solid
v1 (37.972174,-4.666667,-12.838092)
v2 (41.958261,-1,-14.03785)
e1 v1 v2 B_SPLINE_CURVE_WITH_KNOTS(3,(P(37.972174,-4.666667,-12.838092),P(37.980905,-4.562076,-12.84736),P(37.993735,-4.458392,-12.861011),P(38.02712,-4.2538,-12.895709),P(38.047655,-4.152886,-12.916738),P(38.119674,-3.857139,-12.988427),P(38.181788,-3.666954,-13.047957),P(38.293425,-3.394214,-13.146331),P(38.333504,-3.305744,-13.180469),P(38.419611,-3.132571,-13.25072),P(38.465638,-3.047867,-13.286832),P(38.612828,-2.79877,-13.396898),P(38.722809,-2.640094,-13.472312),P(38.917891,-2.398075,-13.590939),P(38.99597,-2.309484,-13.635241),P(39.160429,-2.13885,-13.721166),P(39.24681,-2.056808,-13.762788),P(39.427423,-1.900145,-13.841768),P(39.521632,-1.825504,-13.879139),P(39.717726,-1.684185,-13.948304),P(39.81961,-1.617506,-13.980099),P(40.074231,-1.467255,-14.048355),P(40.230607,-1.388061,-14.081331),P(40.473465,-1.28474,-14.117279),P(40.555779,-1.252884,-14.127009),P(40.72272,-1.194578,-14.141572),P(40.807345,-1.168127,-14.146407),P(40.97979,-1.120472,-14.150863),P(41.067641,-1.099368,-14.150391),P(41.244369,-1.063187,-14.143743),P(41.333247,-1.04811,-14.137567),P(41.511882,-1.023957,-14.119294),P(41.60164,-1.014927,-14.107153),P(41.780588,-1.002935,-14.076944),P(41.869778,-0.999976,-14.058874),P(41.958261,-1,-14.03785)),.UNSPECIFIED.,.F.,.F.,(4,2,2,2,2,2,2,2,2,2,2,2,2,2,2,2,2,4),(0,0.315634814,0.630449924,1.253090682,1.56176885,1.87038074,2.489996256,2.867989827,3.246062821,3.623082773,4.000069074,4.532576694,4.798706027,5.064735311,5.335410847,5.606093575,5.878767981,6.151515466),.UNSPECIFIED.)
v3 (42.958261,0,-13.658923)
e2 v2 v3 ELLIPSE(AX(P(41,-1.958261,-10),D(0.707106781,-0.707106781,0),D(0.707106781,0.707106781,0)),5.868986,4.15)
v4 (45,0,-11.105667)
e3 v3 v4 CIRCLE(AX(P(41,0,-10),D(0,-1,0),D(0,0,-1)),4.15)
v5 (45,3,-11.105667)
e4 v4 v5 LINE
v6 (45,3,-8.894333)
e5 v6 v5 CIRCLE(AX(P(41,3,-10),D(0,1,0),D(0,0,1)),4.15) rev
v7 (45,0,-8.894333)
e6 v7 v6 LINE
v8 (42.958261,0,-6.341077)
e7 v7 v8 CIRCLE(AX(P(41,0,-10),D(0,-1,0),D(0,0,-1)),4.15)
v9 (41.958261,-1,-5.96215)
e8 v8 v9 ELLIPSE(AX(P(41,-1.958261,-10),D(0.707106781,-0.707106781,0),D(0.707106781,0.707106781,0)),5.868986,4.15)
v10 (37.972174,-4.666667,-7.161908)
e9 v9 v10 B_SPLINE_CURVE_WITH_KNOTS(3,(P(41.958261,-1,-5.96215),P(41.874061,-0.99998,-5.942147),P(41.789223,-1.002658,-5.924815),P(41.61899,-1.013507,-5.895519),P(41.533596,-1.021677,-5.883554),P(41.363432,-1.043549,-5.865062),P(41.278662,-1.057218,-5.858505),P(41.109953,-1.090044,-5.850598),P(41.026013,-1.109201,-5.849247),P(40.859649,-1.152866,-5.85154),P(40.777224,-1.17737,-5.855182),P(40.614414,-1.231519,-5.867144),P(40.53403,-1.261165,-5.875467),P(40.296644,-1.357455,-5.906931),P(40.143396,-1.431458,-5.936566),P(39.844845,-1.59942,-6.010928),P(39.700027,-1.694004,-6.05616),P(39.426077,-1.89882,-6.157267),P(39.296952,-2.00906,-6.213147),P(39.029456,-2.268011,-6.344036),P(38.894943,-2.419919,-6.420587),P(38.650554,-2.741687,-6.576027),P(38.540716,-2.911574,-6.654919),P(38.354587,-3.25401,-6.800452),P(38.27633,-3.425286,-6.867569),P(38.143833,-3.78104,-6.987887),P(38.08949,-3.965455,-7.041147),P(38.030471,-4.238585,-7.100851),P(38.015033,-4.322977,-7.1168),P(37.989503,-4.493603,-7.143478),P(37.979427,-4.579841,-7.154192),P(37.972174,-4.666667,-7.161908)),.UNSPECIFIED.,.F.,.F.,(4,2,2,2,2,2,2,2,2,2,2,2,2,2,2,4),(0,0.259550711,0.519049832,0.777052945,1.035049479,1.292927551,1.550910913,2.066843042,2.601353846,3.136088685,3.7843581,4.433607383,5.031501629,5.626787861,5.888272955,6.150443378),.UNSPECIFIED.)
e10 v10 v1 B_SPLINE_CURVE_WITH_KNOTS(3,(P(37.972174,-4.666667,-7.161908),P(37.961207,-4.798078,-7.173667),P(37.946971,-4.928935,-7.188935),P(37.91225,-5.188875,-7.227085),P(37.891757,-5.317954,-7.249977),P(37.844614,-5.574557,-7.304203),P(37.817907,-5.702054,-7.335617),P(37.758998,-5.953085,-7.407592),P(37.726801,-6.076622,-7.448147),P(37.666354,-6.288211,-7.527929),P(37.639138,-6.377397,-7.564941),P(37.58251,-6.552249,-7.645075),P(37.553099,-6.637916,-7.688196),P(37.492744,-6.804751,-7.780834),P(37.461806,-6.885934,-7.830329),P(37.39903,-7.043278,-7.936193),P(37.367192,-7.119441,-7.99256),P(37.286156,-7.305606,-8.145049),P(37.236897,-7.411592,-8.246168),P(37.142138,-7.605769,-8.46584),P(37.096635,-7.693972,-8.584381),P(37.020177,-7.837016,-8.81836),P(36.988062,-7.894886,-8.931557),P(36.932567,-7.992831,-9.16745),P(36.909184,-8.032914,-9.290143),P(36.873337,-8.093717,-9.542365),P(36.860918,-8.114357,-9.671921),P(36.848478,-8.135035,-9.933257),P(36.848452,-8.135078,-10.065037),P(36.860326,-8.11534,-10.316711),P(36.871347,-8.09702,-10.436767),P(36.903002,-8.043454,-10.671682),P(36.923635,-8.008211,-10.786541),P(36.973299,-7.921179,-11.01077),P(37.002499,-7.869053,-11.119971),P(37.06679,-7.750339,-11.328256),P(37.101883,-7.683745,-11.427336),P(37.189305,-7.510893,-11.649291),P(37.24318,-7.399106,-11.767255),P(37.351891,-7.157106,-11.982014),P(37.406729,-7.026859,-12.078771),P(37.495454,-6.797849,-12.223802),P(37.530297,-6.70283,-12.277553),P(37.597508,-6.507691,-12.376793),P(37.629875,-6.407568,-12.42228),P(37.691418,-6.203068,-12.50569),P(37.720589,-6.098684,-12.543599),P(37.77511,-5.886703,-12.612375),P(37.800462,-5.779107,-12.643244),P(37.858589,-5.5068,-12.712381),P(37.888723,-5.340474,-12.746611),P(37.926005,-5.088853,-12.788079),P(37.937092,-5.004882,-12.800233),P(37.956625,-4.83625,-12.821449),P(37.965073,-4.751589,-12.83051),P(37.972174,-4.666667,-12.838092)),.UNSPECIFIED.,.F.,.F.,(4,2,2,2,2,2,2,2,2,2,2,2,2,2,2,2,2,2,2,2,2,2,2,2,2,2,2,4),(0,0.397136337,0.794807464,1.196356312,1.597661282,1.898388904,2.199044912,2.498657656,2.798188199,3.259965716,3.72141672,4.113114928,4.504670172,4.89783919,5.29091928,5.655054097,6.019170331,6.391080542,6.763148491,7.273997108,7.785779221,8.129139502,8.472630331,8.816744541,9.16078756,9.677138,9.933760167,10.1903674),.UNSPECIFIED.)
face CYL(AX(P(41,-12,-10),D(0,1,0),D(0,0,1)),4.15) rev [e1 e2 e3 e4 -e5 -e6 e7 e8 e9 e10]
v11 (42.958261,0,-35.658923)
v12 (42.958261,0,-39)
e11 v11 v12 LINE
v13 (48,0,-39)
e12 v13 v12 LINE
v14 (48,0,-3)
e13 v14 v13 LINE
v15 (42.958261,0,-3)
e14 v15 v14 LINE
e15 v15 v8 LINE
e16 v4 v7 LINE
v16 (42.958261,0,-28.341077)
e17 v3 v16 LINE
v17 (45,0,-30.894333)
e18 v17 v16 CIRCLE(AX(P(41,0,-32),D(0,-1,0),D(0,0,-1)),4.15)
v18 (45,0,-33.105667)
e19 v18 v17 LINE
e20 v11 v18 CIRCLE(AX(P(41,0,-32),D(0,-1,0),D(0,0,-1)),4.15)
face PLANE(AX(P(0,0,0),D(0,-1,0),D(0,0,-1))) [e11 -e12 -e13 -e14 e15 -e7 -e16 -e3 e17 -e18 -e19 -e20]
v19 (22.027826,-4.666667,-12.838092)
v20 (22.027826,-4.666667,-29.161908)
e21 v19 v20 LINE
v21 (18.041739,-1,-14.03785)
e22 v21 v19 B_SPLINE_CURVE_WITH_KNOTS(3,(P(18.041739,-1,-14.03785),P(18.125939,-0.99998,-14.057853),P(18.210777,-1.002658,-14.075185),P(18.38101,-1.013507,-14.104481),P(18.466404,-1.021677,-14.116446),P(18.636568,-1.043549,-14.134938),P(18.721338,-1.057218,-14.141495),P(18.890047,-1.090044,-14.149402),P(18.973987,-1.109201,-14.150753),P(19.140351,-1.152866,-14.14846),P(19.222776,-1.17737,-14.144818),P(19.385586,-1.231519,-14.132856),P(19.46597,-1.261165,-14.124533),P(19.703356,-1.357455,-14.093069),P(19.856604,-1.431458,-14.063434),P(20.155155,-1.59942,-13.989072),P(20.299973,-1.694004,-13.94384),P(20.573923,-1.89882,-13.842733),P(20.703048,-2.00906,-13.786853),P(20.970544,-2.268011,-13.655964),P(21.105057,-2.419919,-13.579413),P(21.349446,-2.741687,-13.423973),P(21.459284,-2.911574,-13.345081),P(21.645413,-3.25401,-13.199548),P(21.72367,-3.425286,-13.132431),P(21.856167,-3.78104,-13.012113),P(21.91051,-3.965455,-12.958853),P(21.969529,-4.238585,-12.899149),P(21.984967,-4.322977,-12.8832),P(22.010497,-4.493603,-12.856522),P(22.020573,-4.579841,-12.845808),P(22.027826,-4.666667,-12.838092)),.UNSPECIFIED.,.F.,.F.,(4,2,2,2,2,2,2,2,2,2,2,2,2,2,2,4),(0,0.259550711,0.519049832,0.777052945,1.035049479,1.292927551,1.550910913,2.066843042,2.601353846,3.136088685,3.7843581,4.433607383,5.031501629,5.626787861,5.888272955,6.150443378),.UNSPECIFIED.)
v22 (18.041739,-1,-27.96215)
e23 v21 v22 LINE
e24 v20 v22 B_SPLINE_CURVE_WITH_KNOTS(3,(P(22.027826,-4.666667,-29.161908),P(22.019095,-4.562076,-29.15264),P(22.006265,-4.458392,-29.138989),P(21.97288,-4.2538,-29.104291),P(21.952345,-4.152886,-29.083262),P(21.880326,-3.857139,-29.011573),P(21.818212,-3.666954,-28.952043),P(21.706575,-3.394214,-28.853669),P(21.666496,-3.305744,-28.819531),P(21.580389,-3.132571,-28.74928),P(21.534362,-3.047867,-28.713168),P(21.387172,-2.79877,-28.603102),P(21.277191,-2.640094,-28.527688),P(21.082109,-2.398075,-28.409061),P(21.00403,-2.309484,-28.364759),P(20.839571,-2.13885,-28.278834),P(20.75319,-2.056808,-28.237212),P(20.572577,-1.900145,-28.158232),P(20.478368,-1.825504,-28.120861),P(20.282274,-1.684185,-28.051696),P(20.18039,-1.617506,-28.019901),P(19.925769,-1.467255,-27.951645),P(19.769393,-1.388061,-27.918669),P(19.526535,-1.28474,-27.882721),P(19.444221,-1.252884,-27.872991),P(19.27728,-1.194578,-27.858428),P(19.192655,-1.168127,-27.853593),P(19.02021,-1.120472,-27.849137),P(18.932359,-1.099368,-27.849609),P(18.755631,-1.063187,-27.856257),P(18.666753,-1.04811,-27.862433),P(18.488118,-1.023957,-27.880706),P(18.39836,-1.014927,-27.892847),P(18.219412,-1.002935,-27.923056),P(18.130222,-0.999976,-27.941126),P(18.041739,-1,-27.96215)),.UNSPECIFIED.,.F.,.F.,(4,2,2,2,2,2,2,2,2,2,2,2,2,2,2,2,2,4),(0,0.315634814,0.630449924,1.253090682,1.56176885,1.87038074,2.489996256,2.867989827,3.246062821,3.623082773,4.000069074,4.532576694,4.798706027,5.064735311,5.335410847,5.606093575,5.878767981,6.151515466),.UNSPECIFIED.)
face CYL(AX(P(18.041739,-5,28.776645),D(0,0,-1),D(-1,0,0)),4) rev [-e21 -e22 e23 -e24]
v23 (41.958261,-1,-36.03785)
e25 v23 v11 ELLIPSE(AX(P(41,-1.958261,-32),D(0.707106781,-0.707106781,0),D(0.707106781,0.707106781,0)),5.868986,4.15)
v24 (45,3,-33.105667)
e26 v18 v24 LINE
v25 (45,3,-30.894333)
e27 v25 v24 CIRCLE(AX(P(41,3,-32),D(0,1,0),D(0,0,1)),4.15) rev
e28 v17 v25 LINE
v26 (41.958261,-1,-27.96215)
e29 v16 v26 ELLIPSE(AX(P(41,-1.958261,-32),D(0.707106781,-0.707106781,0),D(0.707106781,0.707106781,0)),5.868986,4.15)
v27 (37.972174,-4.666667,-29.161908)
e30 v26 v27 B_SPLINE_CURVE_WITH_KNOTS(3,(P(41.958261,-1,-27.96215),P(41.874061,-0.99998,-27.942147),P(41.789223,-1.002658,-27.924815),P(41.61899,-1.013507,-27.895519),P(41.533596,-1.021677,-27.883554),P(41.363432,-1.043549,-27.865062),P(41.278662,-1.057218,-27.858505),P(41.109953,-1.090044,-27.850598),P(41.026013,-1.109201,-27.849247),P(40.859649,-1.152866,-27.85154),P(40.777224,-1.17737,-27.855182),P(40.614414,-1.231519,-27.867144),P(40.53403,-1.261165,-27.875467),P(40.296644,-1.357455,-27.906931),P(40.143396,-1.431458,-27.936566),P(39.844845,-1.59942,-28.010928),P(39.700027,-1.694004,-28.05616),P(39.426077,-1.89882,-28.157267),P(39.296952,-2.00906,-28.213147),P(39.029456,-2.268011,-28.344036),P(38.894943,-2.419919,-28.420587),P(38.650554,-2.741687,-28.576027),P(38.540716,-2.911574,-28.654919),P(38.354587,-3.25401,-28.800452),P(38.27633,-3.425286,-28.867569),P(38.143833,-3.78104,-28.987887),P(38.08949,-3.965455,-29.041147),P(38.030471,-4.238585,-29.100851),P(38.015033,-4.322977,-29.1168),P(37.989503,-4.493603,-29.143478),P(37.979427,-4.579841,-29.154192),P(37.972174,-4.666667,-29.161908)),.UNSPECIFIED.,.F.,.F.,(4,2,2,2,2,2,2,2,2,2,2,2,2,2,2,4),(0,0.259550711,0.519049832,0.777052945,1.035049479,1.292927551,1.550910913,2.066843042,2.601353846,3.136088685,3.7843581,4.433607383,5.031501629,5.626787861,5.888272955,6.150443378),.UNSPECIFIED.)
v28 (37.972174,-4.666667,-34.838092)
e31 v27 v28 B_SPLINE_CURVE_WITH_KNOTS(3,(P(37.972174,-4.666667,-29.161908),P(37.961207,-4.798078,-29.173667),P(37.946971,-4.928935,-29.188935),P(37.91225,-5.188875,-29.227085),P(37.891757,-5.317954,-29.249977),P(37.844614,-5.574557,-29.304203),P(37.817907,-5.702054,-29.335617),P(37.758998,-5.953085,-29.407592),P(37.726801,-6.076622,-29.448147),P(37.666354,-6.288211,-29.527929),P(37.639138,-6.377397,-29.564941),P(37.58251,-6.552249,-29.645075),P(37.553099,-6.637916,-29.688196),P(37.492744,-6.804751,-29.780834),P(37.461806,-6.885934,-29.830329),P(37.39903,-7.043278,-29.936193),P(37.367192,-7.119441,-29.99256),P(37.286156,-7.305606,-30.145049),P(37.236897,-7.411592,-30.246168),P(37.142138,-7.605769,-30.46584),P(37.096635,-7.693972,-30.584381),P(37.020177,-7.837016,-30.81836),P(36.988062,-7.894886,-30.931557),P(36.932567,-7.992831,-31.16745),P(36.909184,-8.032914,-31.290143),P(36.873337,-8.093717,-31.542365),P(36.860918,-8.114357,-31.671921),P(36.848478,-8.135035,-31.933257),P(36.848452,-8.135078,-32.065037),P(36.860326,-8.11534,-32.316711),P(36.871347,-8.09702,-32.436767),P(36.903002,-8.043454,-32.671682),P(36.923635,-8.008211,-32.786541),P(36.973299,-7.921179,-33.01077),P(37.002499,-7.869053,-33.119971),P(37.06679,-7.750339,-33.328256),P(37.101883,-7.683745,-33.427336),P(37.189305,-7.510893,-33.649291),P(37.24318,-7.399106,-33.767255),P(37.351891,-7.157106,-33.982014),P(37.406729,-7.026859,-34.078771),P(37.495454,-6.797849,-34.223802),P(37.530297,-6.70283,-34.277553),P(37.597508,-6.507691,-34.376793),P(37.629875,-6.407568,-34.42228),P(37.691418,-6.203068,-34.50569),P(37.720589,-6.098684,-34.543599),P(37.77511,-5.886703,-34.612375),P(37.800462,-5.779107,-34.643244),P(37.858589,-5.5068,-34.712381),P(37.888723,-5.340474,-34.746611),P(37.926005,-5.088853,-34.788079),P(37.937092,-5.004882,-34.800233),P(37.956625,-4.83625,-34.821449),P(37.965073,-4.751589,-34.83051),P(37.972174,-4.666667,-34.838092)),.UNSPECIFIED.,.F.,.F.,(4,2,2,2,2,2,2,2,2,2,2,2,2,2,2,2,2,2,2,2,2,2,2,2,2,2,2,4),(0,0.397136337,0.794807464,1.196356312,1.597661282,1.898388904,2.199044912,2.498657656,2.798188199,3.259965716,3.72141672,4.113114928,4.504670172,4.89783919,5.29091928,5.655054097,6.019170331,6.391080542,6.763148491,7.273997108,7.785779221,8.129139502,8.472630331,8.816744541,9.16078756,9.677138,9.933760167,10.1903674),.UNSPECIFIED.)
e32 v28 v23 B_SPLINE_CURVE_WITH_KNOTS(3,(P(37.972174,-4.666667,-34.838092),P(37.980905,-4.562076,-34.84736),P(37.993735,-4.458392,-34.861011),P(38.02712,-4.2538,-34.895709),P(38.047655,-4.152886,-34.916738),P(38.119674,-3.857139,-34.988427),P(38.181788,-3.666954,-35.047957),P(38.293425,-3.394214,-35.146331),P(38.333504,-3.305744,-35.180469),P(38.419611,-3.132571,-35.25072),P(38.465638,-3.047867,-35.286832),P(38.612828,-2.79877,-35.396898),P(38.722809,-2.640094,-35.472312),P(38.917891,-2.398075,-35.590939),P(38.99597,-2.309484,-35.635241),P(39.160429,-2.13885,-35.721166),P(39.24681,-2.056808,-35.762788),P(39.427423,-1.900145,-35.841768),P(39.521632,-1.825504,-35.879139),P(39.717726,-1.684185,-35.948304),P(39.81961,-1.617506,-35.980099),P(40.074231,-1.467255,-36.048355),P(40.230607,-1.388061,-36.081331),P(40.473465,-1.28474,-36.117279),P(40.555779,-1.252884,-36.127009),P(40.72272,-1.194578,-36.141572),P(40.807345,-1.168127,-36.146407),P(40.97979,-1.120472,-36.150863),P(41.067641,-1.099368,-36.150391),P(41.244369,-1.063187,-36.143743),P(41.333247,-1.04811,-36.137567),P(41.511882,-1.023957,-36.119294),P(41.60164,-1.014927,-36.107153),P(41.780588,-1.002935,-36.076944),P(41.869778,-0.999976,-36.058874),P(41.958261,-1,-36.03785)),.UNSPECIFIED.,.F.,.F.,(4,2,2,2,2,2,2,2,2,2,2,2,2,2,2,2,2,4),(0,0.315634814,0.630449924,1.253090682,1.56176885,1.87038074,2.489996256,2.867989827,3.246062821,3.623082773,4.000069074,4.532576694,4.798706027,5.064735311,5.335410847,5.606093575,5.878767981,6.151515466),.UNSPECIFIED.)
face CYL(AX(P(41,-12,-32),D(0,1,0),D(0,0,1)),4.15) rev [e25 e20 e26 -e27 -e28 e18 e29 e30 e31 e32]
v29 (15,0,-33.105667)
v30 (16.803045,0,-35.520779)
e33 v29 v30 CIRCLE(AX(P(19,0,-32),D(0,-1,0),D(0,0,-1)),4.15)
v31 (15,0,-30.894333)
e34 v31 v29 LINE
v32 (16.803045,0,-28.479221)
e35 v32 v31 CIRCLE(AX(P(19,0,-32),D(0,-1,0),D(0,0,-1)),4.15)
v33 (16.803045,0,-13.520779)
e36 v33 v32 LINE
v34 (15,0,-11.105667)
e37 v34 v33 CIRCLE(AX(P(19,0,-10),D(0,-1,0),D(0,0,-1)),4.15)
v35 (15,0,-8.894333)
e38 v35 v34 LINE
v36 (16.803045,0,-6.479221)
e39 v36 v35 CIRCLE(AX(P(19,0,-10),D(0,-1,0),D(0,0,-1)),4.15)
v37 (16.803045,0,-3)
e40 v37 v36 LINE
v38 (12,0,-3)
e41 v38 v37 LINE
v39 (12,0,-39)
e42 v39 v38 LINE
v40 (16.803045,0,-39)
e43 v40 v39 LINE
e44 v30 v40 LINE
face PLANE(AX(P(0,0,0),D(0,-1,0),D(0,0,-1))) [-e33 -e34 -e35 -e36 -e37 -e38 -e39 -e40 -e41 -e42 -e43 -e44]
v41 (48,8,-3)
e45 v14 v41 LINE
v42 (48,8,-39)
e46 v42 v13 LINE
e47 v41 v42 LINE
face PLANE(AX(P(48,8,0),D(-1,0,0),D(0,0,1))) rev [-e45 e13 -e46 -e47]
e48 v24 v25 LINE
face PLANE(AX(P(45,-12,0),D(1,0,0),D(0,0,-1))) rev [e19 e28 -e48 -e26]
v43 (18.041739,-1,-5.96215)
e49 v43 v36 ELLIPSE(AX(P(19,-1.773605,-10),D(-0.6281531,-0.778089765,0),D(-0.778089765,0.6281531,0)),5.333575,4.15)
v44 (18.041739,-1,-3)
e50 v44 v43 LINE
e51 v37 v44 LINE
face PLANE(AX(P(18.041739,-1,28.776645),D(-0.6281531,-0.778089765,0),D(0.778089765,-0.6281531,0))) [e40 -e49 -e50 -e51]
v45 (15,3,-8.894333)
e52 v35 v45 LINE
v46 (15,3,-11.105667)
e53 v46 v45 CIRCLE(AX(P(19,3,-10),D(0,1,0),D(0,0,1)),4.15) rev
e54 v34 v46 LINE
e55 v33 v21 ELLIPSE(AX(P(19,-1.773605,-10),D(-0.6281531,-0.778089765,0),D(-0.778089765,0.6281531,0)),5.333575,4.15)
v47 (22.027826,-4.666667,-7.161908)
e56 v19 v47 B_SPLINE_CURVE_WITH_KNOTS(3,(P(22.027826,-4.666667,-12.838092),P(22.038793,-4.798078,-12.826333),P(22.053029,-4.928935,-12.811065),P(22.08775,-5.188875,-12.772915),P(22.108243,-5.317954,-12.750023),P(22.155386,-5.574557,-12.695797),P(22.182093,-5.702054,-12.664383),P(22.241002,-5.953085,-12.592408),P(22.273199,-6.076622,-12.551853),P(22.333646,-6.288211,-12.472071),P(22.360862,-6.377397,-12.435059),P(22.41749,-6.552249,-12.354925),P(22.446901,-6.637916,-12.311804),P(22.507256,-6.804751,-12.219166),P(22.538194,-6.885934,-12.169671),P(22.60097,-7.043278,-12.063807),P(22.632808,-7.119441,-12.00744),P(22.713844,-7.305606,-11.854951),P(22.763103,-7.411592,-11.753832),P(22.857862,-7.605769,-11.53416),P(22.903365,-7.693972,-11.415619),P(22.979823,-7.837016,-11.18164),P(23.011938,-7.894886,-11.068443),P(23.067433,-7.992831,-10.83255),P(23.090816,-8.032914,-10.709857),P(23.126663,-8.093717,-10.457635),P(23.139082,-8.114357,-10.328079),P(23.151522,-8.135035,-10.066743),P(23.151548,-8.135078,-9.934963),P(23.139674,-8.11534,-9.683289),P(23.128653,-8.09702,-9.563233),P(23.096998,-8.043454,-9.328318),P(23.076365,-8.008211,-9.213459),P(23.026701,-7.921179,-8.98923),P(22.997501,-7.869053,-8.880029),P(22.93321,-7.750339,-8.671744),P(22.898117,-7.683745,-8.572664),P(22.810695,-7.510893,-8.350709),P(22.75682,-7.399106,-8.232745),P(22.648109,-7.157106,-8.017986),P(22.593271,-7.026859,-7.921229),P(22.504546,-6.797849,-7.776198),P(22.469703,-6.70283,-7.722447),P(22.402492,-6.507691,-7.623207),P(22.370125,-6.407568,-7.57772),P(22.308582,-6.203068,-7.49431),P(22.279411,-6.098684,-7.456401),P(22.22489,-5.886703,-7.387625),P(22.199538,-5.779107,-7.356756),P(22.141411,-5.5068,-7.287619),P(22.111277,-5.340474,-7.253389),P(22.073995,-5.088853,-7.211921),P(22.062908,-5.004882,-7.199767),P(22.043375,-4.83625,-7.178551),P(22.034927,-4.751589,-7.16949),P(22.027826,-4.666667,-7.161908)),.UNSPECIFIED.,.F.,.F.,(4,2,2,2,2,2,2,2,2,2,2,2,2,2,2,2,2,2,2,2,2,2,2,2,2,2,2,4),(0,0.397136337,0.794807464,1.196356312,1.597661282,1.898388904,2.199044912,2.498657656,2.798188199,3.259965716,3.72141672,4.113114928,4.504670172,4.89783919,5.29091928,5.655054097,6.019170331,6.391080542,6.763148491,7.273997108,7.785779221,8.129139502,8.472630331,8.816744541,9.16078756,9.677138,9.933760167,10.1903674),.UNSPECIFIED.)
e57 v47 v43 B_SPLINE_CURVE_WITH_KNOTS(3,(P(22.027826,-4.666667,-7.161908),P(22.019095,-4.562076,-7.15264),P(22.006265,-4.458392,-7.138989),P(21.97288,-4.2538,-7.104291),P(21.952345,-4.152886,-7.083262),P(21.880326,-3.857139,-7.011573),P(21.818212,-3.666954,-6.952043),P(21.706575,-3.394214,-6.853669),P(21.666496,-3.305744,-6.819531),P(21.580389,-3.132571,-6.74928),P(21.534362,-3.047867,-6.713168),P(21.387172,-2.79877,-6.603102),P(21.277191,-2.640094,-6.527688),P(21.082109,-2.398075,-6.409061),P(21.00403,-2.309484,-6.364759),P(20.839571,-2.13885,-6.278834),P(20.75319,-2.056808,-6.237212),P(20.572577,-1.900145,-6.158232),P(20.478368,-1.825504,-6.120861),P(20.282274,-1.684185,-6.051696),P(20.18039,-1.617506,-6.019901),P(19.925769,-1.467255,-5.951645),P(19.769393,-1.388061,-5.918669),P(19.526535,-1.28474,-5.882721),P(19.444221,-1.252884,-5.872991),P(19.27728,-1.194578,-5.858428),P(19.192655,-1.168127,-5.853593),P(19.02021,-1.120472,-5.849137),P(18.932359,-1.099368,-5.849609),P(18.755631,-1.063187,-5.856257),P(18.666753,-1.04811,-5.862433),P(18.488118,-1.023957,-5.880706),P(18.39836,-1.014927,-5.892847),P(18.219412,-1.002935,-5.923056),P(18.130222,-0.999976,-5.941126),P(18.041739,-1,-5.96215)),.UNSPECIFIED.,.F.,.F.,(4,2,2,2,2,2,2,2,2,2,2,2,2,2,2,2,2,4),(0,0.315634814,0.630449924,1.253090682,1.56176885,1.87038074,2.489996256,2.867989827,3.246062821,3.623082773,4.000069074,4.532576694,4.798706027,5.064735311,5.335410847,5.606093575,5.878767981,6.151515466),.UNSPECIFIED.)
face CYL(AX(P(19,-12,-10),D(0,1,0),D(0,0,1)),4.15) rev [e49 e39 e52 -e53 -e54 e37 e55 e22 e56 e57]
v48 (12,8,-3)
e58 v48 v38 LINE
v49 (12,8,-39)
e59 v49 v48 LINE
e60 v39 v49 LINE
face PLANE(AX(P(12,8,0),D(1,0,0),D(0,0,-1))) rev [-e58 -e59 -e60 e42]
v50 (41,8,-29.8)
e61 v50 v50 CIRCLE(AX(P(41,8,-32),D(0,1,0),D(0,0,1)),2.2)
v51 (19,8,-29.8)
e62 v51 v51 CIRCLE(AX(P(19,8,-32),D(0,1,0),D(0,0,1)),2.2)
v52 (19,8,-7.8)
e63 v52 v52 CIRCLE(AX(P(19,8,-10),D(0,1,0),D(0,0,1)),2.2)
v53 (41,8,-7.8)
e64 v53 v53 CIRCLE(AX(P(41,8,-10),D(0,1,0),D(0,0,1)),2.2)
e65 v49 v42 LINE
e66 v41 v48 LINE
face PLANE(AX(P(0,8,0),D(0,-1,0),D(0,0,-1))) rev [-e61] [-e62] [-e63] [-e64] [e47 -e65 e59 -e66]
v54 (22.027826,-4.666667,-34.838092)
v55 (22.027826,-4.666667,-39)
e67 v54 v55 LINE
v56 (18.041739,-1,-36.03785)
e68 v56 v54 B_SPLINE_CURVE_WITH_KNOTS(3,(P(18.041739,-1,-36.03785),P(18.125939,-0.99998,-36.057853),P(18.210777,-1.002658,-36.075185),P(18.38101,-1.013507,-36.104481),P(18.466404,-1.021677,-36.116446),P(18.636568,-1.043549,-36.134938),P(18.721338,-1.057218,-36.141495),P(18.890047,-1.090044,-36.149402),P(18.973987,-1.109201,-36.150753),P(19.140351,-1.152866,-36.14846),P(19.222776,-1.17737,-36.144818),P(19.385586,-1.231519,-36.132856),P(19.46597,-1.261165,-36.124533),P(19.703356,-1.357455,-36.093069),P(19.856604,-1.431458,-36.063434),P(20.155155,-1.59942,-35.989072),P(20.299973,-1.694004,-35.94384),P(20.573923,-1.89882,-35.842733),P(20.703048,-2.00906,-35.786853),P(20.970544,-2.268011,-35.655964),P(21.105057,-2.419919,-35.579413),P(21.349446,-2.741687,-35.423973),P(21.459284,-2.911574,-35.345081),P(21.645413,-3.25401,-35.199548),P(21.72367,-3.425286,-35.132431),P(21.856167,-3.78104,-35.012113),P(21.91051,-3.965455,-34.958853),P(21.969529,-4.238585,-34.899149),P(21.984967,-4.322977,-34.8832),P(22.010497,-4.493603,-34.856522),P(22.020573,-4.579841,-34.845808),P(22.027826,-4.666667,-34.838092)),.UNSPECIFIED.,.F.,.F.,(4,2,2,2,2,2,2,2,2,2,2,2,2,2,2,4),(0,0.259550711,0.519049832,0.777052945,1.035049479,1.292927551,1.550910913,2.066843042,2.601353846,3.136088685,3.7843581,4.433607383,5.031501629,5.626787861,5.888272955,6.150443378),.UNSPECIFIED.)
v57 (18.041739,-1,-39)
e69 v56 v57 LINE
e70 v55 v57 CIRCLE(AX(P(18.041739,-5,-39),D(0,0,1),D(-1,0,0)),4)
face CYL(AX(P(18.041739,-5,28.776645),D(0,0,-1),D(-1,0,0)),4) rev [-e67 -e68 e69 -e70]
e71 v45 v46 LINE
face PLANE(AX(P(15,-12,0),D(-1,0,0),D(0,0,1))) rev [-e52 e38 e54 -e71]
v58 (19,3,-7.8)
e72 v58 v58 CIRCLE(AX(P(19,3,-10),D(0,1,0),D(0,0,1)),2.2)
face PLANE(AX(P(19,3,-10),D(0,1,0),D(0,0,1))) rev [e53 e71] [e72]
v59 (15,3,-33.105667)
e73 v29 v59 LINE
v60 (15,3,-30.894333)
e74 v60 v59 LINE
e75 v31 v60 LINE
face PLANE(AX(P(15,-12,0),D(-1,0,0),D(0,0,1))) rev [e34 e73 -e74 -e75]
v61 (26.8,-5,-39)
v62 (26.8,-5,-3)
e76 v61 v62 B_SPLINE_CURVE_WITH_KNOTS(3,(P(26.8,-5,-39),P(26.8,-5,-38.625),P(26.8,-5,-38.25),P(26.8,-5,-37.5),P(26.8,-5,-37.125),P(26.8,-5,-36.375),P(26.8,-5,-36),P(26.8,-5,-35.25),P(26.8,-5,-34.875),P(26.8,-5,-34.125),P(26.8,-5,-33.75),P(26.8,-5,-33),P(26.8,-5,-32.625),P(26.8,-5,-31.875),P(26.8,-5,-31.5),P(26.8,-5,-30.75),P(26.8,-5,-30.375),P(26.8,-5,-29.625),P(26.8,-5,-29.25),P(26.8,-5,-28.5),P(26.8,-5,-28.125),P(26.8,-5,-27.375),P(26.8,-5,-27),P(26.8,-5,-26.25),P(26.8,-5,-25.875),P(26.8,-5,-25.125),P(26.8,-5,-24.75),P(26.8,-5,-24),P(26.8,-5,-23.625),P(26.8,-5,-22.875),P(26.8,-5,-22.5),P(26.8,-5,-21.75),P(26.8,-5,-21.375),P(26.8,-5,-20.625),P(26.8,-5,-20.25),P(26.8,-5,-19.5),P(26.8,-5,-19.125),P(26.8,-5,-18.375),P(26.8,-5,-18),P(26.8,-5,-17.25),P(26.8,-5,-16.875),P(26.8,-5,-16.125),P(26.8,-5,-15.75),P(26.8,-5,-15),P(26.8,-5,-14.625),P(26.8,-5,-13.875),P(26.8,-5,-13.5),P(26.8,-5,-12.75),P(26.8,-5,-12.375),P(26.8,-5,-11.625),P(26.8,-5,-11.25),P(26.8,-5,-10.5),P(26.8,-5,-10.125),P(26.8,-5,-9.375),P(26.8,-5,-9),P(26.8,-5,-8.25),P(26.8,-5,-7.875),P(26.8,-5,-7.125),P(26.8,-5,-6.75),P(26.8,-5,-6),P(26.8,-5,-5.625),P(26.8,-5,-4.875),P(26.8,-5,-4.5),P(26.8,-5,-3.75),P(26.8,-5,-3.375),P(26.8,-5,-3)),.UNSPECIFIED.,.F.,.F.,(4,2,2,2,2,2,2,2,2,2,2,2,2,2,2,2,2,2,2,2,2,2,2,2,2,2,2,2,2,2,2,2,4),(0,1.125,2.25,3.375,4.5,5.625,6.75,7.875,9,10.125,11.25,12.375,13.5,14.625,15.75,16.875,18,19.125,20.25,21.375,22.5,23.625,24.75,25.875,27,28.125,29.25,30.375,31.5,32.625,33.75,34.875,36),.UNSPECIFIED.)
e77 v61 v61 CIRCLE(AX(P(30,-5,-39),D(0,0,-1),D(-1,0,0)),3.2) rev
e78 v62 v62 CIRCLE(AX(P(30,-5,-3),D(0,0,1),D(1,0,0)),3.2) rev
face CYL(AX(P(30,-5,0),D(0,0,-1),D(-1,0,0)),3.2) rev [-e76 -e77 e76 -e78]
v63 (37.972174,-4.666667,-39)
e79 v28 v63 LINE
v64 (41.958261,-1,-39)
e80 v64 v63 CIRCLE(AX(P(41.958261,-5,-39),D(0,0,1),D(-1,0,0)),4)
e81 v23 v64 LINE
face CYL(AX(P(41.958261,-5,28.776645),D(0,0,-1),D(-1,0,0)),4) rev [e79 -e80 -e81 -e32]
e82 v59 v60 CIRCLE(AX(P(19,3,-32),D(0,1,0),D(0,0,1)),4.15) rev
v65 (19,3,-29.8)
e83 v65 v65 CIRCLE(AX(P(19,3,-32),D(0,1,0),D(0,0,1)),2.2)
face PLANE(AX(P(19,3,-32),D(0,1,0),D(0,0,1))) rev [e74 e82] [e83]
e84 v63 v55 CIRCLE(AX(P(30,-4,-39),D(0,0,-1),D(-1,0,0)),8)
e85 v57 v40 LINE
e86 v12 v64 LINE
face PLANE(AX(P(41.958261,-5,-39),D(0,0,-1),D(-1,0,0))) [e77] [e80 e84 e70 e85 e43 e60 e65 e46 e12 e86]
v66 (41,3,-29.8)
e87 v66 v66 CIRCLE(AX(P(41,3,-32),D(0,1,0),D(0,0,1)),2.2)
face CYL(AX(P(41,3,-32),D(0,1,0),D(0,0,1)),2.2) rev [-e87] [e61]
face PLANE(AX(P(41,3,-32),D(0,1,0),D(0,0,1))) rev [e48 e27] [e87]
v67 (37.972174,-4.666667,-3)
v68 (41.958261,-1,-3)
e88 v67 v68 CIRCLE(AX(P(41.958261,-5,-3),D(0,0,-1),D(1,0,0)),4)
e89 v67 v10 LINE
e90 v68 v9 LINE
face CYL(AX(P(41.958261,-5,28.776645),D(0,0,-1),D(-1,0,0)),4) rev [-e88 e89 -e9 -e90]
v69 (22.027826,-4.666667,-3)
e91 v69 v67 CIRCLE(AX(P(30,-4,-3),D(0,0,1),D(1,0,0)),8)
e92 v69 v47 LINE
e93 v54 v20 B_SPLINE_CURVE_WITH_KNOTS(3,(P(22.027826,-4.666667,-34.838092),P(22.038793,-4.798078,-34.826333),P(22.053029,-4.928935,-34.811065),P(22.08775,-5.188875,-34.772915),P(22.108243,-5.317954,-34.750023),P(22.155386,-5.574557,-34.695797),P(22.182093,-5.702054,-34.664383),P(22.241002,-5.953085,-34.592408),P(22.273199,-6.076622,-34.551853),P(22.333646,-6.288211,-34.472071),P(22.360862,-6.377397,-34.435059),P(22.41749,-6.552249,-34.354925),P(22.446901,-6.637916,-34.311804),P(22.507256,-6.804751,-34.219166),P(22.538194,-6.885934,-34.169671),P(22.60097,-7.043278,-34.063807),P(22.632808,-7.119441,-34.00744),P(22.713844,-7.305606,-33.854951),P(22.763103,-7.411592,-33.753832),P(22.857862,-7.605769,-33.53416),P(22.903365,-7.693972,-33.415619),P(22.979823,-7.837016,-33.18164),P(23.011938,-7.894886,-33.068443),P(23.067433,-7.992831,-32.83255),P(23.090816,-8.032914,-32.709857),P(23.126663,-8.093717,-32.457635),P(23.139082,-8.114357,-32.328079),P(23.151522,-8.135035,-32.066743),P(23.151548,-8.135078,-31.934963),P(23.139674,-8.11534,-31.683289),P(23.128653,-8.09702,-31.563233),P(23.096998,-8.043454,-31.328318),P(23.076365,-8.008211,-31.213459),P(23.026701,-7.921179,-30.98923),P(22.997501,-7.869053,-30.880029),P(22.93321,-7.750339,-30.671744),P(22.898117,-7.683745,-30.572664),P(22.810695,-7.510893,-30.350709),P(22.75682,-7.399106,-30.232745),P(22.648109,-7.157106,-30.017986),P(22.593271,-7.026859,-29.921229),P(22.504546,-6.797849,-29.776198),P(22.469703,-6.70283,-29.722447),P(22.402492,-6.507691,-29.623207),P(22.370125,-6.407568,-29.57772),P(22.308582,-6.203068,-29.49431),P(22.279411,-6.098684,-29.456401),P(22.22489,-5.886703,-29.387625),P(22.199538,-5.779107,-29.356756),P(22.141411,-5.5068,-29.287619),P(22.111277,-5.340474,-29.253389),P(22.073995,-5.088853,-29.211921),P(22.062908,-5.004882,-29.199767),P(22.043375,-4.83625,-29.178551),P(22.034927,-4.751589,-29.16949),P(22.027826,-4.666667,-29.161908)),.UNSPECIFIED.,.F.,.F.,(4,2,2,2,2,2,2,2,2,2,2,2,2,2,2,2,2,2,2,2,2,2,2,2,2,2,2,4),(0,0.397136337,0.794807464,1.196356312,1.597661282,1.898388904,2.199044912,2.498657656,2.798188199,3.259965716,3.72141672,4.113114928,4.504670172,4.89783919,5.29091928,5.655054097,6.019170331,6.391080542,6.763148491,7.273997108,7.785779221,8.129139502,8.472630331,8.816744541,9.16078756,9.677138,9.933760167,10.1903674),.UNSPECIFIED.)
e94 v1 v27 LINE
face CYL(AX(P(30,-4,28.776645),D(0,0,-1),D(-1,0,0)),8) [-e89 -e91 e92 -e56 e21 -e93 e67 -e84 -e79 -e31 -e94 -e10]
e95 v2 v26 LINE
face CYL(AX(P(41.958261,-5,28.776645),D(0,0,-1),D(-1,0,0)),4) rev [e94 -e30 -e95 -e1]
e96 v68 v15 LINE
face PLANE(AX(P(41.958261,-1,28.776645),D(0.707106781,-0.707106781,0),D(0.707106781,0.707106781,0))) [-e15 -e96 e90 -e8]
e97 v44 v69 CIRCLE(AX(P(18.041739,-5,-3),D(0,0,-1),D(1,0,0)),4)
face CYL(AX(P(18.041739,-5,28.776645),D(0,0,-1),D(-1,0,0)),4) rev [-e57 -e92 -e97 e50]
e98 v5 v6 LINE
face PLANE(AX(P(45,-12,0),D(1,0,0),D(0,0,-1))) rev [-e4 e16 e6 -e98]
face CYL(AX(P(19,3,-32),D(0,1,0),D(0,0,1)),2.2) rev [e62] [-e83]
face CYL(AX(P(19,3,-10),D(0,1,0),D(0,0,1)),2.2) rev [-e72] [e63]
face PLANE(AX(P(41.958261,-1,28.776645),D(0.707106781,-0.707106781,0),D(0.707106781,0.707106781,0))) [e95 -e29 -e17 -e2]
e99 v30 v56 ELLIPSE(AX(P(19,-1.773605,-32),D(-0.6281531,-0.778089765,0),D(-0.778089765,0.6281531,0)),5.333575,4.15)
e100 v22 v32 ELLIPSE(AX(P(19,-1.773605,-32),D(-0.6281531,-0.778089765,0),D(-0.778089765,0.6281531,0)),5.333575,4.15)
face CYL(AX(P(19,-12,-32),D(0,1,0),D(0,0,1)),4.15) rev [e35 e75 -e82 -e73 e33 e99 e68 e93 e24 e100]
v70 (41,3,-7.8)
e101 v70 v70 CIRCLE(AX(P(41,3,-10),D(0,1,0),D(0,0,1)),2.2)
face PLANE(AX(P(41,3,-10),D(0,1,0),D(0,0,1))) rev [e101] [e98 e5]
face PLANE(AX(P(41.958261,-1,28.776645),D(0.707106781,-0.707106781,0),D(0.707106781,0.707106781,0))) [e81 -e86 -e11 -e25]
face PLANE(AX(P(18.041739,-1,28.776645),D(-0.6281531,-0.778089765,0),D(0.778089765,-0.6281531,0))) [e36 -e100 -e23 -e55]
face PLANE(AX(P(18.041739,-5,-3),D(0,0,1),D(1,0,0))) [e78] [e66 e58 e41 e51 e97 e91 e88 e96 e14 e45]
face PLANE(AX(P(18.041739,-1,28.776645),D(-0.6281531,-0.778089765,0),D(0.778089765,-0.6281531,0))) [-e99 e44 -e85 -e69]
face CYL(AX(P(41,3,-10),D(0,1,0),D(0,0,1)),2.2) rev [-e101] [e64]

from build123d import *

# Parameters (mm, degrees)
SKETCH1_W            = 60
SKETCH1_H            = 42
BOSS_EXTRUDE1_DEPTH  = 8
SKETCH3_W            = 10
SKETCH3_H            = 42
BOSS_EXTRUDE5_DEPTH  = 6
SKETCH5_W            = 14
SKETCH5_H            = 42
BOSS_EXTRUDE6_DEPTH  = 11
SKETCH6_R            = 3.2
CUT_EXTRUDE1_DEPTH   = 75.565407529
FILLET1_R            = 7
FILLET2_R            = 5
FILLET3_R            = 5
BOSS_EXTRUDE7_DEPTH  = 42
SKETCH9_W            = 5
SKETCH9_H            = 42
BOSS_EXTRUDE8_DEPTH  = 6
SKETCH11_W           = 15
SKETCH11_H           = 42
CUT_EXTRUDE2_DEPTH   = 76.921011584
SKETCH12_W           = 30
SKETCH12_H           = 42
CUT_EXTRUDE3_DEPTH   = 6
SKETCH15_W           = 42
SKETCH15_H           = 8
BOSS_EXTRUDE9_DEPTH  = 5
SKETCH16_W           = 42
SKETCH16_H           = 8
BOSS_EXTRUDE10_DEPTH = 5
CUT_EXTRUDE7_START   = -17
CUT_EXTRUDE7_DEPTH   = 17
BOSS_EXTRUDE11_START = -5
SKETCH17_R           = 4.15
SKETCH17_R_2         = 2.2
BOSS_EXTRUDE11_DEPTH = 5
SKETCH18_W           = 2
SKETCH18_H           = 42
CUT_EXTRUDE8_DEPTH   = 67.392770772
CUT_EXTRUDE9_DEPTH   = 3
CUT_EXTRUDE10_START  = -3
CUT_EXTRUDE10_DEPTH  = 3


with BuildPart() as part:
    # Sketch1 → Boss-Extrude1 (new body)
    with BuildSketch(Plane(origin=(0, 0, 0), x_dir=(1, 0, 0), z_dir=(0, 1, 0))):
        with Locations((30, 21)):
            Rectangle(SKETCH1_W, SKETCH1_H)
    extrude(amount=BOSS_EXTRUDE1_DEPTH)

    # Sketch3 → Boss-Extrude5 (add)
    with BuildSketch(Plane(origin=(0, 8, 0), x_dir=(1, 0, 0), z_dir=(0, 1, 0))):
        with Locations((30, 21)):
            Rectangle(SKETCH3_W, SKETCH3_H)
    extrude(amount=BOSS_EXTRUDE5_DEPTH)

    # Sketch5 → Boss-Extrude6 (add)
    with BuildSketch(Plane.XZ):
        with Locations((30, -21)):
            Rectangle(SKETCH5_W, SKETCH5_H)
    extrude(amount=BOSS_EXTRUDE6_DEPTH)

    # Sketch6 → Cut-Extrude1 (cut, through all)
    with BuildSketch(Plane(origin=(0, 0, -42), x_dir=(-1, 0, 0), z_dir=(0, 0, -1))):
        with Locations((-30, -5)):
            Circle(SKETCH6_R)
    extrude(amount=-CUT_EXTRUDE1_DEPTH, mode=Mode.SUBTRACT)

    # Fillet1
    fillet1_edges = [part.edges().sort_by_distance(p)[0] for p in [
        (23, -11, -21),
        (37, -11, -21),
    ]]
    fillet(fillet1_edges, radius=FILLET1_R - 0.0001)  # a hair under: the kernel refuses the full size

    # Fillet2
    fillet2_edges = [part.edges().sort_by_distance(p)[0] for p in [
        (23, 0, -21),
    ]]
    fillet(fillet2_edges, radius=FILLET2_R)

    # Fillet3
    fillet3_edges = [part.edges().sort_by_distance(p)[0] for p in [
        (37, 0, -21),
    ]]
    fillet(fillet3_edges, radius=FILLET3_R)

    # Sketch8 → Boss-Extrude7 (add)
    with BuildSketch(Plane(origin=(0, 0, -42), x_dir=(-1, 0, 0), z_dir=(0, 0, -1))):
        with BuildLine():
            Line((-41.958260743, -1), (-42.958260743, 0))
            Line((-42.958260743, 0), (-41.958260743, 0))
            ThreePointArc((-41.958260743, 0), (-38.573244741, -1.320099639), (-36.9756521, -4.583333333))
            ThreePointArc((-36.9756521, -4.583333333), (-34.739022403, -9.151860505), (-30, -11))
            ThreePointArc((-30, -11), (-25.260977597, -9.151860505), (-23.0243479, -4.583333333))
            ThreePointArc((-23.0243479, -4.583333333), (-21.426755259, -1.320099639), (-18.041739257, 0))
            Line((-18.041739257, 0), (-16.803044796, 0))
            Line((-16.803044796, 0), (-18.041739257, -1))
            ThreePointArc((-18.041739257, -1), (-20.749752058, -2.056079711), (-22.027826171, -4.666666667))
            ThreePointArc((-22.027826171, -4.666666667), (-24.583974397, -9.887840578), (-30, -12))
            ThreePointArc((-30, -12), (-35.416025603, -9.887840578), (-37.972173829, -4.666666667))
            ThreePointArc((-37.972173829, -4.666666667), (-39.250247942, -2.056079711), (-41.958260743, -1))
        make_face()
    extrude(amount=-BOSS_EXTRUDE7_DEPTH)

    # Sketch9 → Boss-Extrude8 (add)
    with BuildSketch(Plane(origin=(0, 8, 0), x_dir=(1, 0, 0), z_dir=(0, 1, 0))):
        with Locations((42.5, 21)):
            Rectangle(SKETCH9_W, SKETCH9_H)
        with Locations((17.5, 21)):
            Rectangle(SKETCH9_W, SKETCH9_H)
    extrude(amount=BOSS_EXTRUDE8_DEPTH)

    # Sketch11 → Cut-Extrude2 (cut, through all)
    with BuildSketch(Plane(origin=(0, 8, 0), x_dir=(1, 0, 0), z_dir=(0, 1, 0))):
        with Locations((52.5, 21)):
            Rectangle(SKETCH11_W, SKETCH11_H)
        with Locations((7.5, 21)):
            Rectangle(SKETCH11_W, SKETCH11_H)
    extrude(amount=-CUT_EXTRUDE2_DEPTH, mode=Mode.SUBTRACT)

    # Sketch12 → Cut-Extrude3 (cut)
    with BuildSketch(Plane(origin=(0, 14, 0), x_dir=(1, 0, 0), z_dir=(0, 1, 0))):
        with Locations((30, 21)):
            Rectangle(SKETCH12_W, SKETCH12_H)
    extrude(amount=-CUT_EXTRUDE3_DEPTH, mode=Mode.SUBTRACT)

    # Sketch15 → Boss-Extrude9 (add)
    with BuildSketch(Plane.ZY.offset(-15)):
        with Locations((-21, 4)):
            Rectangle(SKETCH15_W, SKETCH15_H)
    extrude(amount=BOSS_EXTRUDE9_DEPTH)

    # Sketch16 → Boss-Extrude10 (add)
    with BuildSketch(Plane(origin=(45, 0, 0), x_dir=(0, 0, -1), z_dir=(1, 0, 0))):
        with Locations((21, 4)):
            Rectangle(SKETCH16_W, SKETCH16_H)
    extrude(amount=BOSS_EXTRUDE10_DEPTH)

    # Cut-Extrude7: read off the stored shape, not the designer's step
    # Cut-Extrude7 outline → Cut-Extrude7 (cut)
    with BuildSketch(Plane(origin=(0, 8, 0), x_dir=(1, 0, 0), z_dir=(0, 1, 0)).offset(CUT_EXTRUDE7_START)):
        with BuildLine():
            ThreePointArc((45, 33.105667219), (36.85, 32), (45, 30.894332781))
            Line((45, 30.894332781), (45, 33.105667219))
        make_face()
        with BuildLine():
            ThreePointArc((45, 11.105667219), (36.85, 10), (45, 8.894332781))
            Line((45, 8.894332781), (45, 11.105667219))
        make_face()
        with BuildLine():
            ThreePointArc((15, 8.894332781), (23.15, 10), (15, 11.105667219))
            Line((15, 11.105667219), (15, 8.894332781))
        make_face()
        with BuildLine():
            ThreePointArc((15, 30.894332781), (23.15, 32), (15, 33.105667219))
            Line((15, 33.105667219), (15, 30.894332781))
        make_face()
    extrude(amount=CUT_EXTRUDE7_DEPTH, mode=Mode.SUBTRACT)

    # Sketch17 → Boss-Extrude11 (add)
    # profile 1 of 4: a face of its own
    with BuildSketch(Plane(origin=(0, 8, 0), x_dir=(1, 0, 0), z_dir=(0, 1, 0)).offset(BOSS_EXTRUDE11_START)):
        with Locations((41, 32)):
            Circle(SKETCH17_R)
        with Locations(Location((41, 32, 0), (0, 0, 270))):
            Circle(SKETCH17_R_2, mode=Mode.SUBTRACT)
    # profile 2 of 4: a face of its own
    with BuildSketch(Plane(origin=(0, 8, 0), x_dir=(1, 0, 0), z_dir=(0, 1, 0)).offset(BOSS_EXTRUDE11_START)):
        with Locations((19, 10)):
            Circle(SKETCH17_R)
        with Locations(Location((19, 10, 0), (0, 0, 270))):
            Circle(SKETCH17_R_2, mode=Mode.SUBTRACT)
    # profile 3 of 4: a face of its own
    with BuildSketch(Plane(origin=(0, 8, 0), x_dir=(1, 0, 0), z_dir=(0, 1, 0)).offset(BOSS_EXTRUDE11_START)):
        with Locations((41, 10)):
            Circle(SKETCH17_R)
        with Locations(Location((41, 10, 0), (0, 0, 270))):
            Circle(SKETCH17_R_2, mode=Mode.SUBTRACT)
    # profile 4 of 4: a face of its own
    with BuildSketch(Plane(origin=(0, 8, 0), x_dir=(1, 0, 0), z_dir=(0, 1, 0)).offset(BOSS_EXTRUDE11_START)):
        with Locations((19, 32)):
            Circle(SKETCH17_R)
        with Locations(Location((19, 32, 0), (0, 0, 270))):
            Circle(SKETCH17_R_2, mode=Mode.SUBTRACT)
    extrude(amount=BOSS_EXTRUDE11_DEPTH)

    # Sketch18 → Cut-Extrude8 (cut, through all)
    with BuildSketch(Plane.XZ):
        with Locations((11, -21)):
            Rectangle(SKETCH18_W, SKETCH18_H)
        with Locations((49, -21)):
            Rectangle(SKETCH18_W, SKETCH18_H)
    extrude(amount=-CUT_EXTRUDE8_DEPTH, mode=Mode.SUBTRACT)

    # Sketch20 → Cut-Extrude9 (cut)
    with BuildSketch(Plane(origin=(0, 0, -42), x_dir=(-1, 0, 0), z_dir=(0, 0, -1))):
        with BuildLine():
            Line((-16.803044796, 0), (-12, 0))
            Line((-12, 0), (-12, 8))
            Line((-12, 8), (-48, 8))
            Line((-48, 8), (-48, 0))
            Line((-48, 0), (-42.958260743, 0))
            Line((-42.958260743, 0), (-41.958260743, -1))
            ThreePointArc((-41.958260743, -1), (-39.250247942, -2.056079711), (-37.972173829, -4.666666667))
            ThreePointArc((-37.972173829, -4.666666667), (-30, -12), (-22.027826171, -4.666666667))
            ThreePointArc((-22.027826171, -4.666666667), (-20.749752058, -2.056079711), (-18.041739257, -1))
            Line((-18.041739257, -1), (-16.803044796, 0))
        make_face()
    extrude(amount=-CUT_EXTRUDE9_DEPTH, mode=Mode.SUBTRACT)

    # Sketch19 → Cut-Extrude10 (cut)
    with BuildSketch(Plane.XY.offset(CUT_EXTRUDE10_START)):
        with BuildLine():
            Line((48, 8), (12, 8))
            Line((12, 8), (12, 0))
            Line((12, 0), (16.803044796, 0))
            Line((16.803044796, 0), (18.041739257, -1))
            ThreePointArc((18.041739257, -1), (20.749752058, -2.056079711), (22.027826171, -4.666666667))
            ThreePointArc((22.027826171, -4.666666667), (30, -12), (37.972173829, -4.666666667))
            ThreePointArc((37.972173829, -4.666666667), (39.250247942, -2.056079711), (41.958260743, -1))
            Line((41.958260743, -1), (42.958260743, 0))
            Line((42.958260743, 0), (48, 0))
            Line((48, 0), (48, 8))
        make_face()
    extrude(amount=CUT_EXTRUDE10_DEPTH, mode=Mode.SUBTRACT)


solid = part.part
